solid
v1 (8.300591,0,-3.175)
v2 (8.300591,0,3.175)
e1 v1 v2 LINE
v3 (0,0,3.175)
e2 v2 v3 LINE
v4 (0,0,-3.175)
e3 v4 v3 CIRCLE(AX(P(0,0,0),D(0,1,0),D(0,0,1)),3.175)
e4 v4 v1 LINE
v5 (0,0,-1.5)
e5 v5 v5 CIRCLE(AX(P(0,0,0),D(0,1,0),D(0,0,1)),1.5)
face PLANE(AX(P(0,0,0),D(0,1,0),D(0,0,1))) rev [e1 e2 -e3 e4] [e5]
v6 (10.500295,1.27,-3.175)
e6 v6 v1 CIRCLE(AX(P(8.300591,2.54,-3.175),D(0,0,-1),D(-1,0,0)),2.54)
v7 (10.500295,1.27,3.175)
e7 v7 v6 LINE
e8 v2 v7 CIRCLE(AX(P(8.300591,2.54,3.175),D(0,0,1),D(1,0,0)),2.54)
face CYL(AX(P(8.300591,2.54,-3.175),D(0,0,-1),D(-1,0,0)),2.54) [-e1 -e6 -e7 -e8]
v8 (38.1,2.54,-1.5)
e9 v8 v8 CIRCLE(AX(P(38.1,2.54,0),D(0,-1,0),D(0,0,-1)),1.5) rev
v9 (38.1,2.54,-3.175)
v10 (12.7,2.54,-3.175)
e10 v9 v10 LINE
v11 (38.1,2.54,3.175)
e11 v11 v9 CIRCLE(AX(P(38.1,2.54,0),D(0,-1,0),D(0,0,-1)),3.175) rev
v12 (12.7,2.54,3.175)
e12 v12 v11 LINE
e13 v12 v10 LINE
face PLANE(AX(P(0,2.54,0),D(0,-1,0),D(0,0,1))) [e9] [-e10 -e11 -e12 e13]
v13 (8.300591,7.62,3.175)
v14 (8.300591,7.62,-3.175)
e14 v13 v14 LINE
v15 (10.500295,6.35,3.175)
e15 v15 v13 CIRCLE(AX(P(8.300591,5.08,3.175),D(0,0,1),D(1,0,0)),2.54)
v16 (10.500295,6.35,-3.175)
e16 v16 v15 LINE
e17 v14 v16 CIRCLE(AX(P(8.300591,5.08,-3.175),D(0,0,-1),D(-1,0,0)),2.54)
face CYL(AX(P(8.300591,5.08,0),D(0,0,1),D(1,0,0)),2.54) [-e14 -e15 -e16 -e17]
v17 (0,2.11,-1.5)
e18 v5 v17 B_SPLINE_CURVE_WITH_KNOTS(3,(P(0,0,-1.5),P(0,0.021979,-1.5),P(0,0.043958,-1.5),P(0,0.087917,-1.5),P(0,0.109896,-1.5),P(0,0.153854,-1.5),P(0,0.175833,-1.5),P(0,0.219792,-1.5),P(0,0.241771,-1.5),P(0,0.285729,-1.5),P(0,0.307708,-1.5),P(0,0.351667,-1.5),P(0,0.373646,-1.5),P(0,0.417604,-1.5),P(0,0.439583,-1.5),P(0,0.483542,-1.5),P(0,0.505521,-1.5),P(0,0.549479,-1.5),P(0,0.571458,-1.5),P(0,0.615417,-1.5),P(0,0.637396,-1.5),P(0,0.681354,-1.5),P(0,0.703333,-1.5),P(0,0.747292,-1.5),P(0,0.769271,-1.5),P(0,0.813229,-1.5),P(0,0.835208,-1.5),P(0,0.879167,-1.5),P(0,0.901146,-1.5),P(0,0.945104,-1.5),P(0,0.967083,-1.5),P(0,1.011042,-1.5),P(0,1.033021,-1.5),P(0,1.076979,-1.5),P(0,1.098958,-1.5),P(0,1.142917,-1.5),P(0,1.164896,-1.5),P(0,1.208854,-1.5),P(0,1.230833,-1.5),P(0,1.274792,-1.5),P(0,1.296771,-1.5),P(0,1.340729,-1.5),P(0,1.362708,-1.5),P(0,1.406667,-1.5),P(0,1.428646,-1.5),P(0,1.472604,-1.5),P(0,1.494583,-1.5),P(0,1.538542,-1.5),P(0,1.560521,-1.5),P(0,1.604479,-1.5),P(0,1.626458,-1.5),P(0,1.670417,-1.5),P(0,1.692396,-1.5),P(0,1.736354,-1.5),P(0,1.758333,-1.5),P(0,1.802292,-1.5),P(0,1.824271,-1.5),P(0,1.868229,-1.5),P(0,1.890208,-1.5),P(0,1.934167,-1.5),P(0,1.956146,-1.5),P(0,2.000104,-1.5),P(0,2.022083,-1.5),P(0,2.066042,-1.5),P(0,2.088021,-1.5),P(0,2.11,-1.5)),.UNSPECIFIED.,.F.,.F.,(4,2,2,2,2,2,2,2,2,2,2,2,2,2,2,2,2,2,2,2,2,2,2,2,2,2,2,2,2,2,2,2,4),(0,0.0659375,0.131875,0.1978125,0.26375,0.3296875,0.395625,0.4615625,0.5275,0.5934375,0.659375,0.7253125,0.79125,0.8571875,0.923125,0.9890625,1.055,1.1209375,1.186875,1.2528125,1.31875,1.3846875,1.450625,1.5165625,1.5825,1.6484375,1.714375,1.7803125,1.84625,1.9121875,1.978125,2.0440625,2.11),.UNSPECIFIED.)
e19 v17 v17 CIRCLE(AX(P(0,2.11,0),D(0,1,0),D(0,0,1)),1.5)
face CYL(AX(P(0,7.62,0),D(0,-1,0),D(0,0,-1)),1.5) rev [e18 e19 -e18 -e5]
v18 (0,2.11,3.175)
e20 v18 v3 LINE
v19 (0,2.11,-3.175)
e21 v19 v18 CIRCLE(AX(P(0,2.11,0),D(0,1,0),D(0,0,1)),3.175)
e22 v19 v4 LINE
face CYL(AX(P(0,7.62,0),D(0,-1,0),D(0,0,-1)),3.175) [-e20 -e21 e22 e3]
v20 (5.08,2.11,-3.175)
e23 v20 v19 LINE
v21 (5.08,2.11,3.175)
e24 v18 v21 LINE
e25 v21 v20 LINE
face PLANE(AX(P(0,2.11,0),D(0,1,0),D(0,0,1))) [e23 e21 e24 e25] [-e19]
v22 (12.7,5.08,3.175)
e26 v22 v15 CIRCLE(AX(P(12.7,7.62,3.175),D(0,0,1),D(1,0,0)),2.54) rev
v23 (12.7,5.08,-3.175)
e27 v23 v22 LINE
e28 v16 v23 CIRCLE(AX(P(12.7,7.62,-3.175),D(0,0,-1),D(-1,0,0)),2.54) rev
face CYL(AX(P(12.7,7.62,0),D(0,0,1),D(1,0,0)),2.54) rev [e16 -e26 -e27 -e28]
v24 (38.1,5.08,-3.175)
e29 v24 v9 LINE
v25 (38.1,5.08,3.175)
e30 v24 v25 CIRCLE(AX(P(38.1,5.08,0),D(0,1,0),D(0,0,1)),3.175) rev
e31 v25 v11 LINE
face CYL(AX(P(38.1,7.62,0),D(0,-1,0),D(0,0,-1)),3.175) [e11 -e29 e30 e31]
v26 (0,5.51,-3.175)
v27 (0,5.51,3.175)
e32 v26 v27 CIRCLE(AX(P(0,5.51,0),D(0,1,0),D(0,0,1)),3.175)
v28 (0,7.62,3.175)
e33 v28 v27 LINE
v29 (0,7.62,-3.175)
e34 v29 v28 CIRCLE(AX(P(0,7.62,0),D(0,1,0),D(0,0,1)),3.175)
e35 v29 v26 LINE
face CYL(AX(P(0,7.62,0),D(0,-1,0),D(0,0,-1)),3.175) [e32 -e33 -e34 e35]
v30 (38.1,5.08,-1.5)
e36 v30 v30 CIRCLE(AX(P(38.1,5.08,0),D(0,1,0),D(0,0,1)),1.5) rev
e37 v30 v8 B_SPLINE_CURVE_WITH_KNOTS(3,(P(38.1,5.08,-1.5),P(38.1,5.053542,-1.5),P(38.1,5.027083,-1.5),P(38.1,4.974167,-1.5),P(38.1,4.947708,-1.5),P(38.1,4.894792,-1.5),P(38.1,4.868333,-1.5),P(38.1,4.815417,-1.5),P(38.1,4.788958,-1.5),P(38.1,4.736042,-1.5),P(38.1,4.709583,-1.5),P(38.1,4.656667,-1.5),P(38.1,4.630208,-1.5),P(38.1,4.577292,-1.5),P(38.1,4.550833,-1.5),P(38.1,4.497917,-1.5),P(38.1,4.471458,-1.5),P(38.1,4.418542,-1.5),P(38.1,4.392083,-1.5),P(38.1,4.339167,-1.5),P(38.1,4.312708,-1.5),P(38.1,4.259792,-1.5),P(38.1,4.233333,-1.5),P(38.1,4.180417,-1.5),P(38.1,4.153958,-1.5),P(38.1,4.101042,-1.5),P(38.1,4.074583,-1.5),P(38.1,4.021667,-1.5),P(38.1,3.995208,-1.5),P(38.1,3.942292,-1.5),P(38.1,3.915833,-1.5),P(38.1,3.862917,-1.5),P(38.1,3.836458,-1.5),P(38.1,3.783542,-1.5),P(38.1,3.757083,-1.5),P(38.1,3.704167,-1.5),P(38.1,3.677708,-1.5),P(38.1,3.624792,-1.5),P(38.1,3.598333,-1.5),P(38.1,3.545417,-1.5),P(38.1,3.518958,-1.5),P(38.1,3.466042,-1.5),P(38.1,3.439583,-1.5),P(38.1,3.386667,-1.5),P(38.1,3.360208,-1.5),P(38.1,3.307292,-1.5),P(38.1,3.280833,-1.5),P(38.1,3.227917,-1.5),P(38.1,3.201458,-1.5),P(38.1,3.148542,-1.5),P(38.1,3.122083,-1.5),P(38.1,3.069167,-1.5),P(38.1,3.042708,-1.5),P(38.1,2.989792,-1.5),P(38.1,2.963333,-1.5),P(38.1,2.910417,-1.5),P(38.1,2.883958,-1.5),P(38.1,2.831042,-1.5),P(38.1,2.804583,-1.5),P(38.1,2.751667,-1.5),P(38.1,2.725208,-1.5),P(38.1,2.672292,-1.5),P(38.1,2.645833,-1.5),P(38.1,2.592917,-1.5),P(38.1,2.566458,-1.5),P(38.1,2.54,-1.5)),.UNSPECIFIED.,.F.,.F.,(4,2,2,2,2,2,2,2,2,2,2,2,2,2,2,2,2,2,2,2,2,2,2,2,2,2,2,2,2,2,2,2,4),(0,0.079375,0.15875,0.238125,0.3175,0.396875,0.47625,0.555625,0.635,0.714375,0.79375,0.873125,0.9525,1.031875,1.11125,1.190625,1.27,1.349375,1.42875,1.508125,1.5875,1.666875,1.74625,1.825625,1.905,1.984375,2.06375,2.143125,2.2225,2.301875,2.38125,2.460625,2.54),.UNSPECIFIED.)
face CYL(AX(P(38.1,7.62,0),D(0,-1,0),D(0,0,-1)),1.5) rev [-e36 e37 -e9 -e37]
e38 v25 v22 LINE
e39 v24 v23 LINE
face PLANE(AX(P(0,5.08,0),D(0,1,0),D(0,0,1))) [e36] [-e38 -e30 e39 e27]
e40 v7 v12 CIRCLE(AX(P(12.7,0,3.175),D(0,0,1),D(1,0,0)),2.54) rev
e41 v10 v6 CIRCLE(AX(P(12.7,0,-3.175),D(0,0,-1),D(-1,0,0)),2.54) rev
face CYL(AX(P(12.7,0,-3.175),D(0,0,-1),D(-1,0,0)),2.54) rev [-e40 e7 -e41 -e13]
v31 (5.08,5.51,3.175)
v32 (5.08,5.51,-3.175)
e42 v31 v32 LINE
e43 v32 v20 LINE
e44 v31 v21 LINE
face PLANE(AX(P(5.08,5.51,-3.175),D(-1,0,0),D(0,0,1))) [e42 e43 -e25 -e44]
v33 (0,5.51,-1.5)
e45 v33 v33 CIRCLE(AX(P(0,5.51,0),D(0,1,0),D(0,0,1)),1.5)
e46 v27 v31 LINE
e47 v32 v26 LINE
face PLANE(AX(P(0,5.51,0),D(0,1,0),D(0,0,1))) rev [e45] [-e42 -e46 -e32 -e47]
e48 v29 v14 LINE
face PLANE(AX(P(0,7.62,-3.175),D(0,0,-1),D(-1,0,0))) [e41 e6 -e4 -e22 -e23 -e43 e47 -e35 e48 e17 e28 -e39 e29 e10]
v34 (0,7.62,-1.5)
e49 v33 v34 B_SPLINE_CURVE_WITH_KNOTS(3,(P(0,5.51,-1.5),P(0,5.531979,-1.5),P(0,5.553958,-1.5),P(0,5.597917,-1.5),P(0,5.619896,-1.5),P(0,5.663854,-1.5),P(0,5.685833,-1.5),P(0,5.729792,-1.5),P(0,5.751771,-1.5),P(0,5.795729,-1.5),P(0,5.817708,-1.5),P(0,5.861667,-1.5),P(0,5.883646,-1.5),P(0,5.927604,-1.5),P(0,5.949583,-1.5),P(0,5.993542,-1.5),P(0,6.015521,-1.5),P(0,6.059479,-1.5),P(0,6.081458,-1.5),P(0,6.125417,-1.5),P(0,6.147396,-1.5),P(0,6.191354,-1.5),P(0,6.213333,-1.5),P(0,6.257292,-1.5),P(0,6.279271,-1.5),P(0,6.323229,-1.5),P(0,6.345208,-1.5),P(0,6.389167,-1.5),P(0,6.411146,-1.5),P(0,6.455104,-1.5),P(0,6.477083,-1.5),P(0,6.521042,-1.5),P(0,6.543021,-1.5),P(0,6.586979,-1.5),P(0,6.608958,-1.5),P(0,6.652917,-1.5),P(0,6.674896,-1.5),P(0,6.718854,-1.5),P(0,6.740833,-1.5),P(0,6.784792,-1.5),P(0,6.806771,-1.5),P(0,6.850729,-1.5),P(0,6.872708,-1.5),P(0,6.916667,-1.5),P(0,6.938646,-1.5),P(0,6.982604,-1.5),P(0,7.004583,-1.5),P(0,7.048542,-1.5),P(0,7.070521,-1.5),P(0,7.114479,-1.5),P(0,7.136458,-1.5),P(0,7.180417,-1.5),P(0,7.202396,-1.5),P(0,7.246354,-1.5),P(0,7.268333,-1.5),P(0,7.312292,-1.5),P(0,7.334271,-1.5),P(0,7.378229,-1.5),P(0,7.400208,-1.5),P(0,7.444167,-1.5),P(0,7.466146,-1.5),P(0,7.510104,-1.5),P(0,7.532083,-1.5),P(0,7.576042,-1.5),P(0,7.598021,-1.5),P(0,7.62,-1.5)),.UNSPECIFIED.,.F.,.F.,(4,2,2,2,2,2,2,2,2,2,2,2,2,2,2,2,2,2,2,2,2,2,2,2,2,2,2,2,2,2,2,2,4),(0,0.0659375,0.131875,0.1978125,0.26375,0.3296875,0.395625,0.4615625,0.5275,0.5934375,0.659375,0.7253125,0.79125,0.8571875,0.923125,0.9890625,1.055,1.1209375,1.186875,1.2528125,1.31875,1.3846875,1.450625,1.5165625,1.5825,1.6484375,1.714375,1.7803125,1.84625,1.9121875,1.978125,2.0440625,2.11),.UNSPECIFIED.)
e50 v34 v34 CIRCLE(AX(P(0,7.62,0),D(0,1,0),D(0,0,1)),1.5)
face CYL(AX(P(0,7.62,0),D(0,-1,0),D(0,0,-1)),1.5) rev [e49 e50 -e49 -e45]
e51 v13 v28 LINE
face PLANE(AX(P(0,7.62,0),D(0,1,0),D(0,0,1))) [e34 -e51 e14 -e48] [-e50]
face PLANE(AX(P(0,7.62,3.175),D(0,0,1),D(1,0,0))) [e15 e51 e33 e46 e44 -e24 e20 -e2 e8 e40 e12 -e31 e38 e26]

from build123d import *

# Parameters (mm, degrees)
SKETCH1_R               = 1.5
BOSS_EXTRUDE1_DEPTH     = 7.62
CUT_EXTRUDE1_DEPTH      = 1.7
CUT_EXTRUDE1_DEPTH_BACK = 1.7
SKETCH2_R               = 1.5
SKETCH3_W               = 34.821950375
SKETCH3_H               = 10.205546921
CUT_EXTRUDE2_DEPTH      = 2.54
FILLET1_R               = 2.54
FILLET2_R               = 2.54


with BuildPart() as part:
    # Sketch1 → Boss-Extrude1 (new body)
    with BuildSketch(Plane(origin=(0, 0, 0), x_dir=(1, 0, 0), z_dir=(0, 1, 0))):
        with BuildLine():
            ThreePointArc((0, 3.175), (-3.175, 0), (0, -3.175))
            Line((0, -3.175), (38.1, -3.175))
            ThreePointArc((38.1, -3.175), (41.275, 0), (38.1, 3.175))
            Line((38.1, 3.175), (0, 3.175))
        make_face()
        with Locations(Location((0, 0, 0), (0, 0, 90))):
            Circle(SKETCH1_R, mode=Mode.SUBTRACT)
        with Locations(Location((38.1, 0, 0), (0, 0, 90))):
            Circle(SKETCH1_R, mode=Mode.SUBTRACT)
    extrude(amount=BOSS_EXTRUDE1_DEPTH)

    # Sketch2 → Cut-Extrude1 (cut, two sides: drawn at the far end of the back side and taken through both)
    with BuildSketch(Plane(origin=(0, 3.81, 0), x_dir=(1, 0, 0), z_dir=(0, 1, 0)).offset(-CUT_EXTRUDE1_DEPTH_BACK)):
        with BuildLine():
            Line((0, 3.175), (5.08, 3.175))
            Line((5.08, 3.175), (5.08, -3.175))
            Line((5.08, -3.175), (0, -3.175))
            ThreePointArc((0, -3.175), (-3.175, 0), (0, 3.175))
        make_face()
        with Locations(Location((0, 0, 0), (0, 0, 90))):
            Circle(SKETCH2_R, mode=Mode.SUBTRACT)
    extrude(amount=CUT_EXTRUDE1_DEPTH + CUT_EXTRUDE1_DEPTH_BACK, mode=Mode.SUBTRACT)

    # Sketch3 → Cut-Extrude2 (cut)
    with BuildSketch(Plane(origin=(0, 7.62, 0), x_dir=(1, 0, 0), z_dir=(0, 1, 0))):
        with Locations((27.570975188, -1.92777346)):
            Rectangle(SKETCH3_W, SKETCH3_H)
    cut_extrude2 = extrude(amount=-CUT_EXTRUDE2_DEPTH, mode=Mode.SUBTRACT)

    # Mirror1: Cut-Extrude2 across plane
    add(cut_extrude2.mirror(Plane.ZX.offset(3.81)), mode=Mode.SUBTRACT)

    # Fillet1
    fillet1_edges = [part.edges().sort_by_distance(p)[0] for p in [
        (10.16, 5.08, 0),
        (10.16, 2.54, 0),
    ]]
    fillet(fillet1_edges, radius=FILLET1_R - 0.0001)  # a hair under: the kernel refuses the full size

    # Fillet2
    fillet2_edges = [part.edges().sort_by_distance(p)[0] for p in [
        (10.16, 7.62, 0),
        (10.16, 0, 0),
    ]]
    fillet(fillet2_edges, radius=FILLET2_R)


solid = part.part
